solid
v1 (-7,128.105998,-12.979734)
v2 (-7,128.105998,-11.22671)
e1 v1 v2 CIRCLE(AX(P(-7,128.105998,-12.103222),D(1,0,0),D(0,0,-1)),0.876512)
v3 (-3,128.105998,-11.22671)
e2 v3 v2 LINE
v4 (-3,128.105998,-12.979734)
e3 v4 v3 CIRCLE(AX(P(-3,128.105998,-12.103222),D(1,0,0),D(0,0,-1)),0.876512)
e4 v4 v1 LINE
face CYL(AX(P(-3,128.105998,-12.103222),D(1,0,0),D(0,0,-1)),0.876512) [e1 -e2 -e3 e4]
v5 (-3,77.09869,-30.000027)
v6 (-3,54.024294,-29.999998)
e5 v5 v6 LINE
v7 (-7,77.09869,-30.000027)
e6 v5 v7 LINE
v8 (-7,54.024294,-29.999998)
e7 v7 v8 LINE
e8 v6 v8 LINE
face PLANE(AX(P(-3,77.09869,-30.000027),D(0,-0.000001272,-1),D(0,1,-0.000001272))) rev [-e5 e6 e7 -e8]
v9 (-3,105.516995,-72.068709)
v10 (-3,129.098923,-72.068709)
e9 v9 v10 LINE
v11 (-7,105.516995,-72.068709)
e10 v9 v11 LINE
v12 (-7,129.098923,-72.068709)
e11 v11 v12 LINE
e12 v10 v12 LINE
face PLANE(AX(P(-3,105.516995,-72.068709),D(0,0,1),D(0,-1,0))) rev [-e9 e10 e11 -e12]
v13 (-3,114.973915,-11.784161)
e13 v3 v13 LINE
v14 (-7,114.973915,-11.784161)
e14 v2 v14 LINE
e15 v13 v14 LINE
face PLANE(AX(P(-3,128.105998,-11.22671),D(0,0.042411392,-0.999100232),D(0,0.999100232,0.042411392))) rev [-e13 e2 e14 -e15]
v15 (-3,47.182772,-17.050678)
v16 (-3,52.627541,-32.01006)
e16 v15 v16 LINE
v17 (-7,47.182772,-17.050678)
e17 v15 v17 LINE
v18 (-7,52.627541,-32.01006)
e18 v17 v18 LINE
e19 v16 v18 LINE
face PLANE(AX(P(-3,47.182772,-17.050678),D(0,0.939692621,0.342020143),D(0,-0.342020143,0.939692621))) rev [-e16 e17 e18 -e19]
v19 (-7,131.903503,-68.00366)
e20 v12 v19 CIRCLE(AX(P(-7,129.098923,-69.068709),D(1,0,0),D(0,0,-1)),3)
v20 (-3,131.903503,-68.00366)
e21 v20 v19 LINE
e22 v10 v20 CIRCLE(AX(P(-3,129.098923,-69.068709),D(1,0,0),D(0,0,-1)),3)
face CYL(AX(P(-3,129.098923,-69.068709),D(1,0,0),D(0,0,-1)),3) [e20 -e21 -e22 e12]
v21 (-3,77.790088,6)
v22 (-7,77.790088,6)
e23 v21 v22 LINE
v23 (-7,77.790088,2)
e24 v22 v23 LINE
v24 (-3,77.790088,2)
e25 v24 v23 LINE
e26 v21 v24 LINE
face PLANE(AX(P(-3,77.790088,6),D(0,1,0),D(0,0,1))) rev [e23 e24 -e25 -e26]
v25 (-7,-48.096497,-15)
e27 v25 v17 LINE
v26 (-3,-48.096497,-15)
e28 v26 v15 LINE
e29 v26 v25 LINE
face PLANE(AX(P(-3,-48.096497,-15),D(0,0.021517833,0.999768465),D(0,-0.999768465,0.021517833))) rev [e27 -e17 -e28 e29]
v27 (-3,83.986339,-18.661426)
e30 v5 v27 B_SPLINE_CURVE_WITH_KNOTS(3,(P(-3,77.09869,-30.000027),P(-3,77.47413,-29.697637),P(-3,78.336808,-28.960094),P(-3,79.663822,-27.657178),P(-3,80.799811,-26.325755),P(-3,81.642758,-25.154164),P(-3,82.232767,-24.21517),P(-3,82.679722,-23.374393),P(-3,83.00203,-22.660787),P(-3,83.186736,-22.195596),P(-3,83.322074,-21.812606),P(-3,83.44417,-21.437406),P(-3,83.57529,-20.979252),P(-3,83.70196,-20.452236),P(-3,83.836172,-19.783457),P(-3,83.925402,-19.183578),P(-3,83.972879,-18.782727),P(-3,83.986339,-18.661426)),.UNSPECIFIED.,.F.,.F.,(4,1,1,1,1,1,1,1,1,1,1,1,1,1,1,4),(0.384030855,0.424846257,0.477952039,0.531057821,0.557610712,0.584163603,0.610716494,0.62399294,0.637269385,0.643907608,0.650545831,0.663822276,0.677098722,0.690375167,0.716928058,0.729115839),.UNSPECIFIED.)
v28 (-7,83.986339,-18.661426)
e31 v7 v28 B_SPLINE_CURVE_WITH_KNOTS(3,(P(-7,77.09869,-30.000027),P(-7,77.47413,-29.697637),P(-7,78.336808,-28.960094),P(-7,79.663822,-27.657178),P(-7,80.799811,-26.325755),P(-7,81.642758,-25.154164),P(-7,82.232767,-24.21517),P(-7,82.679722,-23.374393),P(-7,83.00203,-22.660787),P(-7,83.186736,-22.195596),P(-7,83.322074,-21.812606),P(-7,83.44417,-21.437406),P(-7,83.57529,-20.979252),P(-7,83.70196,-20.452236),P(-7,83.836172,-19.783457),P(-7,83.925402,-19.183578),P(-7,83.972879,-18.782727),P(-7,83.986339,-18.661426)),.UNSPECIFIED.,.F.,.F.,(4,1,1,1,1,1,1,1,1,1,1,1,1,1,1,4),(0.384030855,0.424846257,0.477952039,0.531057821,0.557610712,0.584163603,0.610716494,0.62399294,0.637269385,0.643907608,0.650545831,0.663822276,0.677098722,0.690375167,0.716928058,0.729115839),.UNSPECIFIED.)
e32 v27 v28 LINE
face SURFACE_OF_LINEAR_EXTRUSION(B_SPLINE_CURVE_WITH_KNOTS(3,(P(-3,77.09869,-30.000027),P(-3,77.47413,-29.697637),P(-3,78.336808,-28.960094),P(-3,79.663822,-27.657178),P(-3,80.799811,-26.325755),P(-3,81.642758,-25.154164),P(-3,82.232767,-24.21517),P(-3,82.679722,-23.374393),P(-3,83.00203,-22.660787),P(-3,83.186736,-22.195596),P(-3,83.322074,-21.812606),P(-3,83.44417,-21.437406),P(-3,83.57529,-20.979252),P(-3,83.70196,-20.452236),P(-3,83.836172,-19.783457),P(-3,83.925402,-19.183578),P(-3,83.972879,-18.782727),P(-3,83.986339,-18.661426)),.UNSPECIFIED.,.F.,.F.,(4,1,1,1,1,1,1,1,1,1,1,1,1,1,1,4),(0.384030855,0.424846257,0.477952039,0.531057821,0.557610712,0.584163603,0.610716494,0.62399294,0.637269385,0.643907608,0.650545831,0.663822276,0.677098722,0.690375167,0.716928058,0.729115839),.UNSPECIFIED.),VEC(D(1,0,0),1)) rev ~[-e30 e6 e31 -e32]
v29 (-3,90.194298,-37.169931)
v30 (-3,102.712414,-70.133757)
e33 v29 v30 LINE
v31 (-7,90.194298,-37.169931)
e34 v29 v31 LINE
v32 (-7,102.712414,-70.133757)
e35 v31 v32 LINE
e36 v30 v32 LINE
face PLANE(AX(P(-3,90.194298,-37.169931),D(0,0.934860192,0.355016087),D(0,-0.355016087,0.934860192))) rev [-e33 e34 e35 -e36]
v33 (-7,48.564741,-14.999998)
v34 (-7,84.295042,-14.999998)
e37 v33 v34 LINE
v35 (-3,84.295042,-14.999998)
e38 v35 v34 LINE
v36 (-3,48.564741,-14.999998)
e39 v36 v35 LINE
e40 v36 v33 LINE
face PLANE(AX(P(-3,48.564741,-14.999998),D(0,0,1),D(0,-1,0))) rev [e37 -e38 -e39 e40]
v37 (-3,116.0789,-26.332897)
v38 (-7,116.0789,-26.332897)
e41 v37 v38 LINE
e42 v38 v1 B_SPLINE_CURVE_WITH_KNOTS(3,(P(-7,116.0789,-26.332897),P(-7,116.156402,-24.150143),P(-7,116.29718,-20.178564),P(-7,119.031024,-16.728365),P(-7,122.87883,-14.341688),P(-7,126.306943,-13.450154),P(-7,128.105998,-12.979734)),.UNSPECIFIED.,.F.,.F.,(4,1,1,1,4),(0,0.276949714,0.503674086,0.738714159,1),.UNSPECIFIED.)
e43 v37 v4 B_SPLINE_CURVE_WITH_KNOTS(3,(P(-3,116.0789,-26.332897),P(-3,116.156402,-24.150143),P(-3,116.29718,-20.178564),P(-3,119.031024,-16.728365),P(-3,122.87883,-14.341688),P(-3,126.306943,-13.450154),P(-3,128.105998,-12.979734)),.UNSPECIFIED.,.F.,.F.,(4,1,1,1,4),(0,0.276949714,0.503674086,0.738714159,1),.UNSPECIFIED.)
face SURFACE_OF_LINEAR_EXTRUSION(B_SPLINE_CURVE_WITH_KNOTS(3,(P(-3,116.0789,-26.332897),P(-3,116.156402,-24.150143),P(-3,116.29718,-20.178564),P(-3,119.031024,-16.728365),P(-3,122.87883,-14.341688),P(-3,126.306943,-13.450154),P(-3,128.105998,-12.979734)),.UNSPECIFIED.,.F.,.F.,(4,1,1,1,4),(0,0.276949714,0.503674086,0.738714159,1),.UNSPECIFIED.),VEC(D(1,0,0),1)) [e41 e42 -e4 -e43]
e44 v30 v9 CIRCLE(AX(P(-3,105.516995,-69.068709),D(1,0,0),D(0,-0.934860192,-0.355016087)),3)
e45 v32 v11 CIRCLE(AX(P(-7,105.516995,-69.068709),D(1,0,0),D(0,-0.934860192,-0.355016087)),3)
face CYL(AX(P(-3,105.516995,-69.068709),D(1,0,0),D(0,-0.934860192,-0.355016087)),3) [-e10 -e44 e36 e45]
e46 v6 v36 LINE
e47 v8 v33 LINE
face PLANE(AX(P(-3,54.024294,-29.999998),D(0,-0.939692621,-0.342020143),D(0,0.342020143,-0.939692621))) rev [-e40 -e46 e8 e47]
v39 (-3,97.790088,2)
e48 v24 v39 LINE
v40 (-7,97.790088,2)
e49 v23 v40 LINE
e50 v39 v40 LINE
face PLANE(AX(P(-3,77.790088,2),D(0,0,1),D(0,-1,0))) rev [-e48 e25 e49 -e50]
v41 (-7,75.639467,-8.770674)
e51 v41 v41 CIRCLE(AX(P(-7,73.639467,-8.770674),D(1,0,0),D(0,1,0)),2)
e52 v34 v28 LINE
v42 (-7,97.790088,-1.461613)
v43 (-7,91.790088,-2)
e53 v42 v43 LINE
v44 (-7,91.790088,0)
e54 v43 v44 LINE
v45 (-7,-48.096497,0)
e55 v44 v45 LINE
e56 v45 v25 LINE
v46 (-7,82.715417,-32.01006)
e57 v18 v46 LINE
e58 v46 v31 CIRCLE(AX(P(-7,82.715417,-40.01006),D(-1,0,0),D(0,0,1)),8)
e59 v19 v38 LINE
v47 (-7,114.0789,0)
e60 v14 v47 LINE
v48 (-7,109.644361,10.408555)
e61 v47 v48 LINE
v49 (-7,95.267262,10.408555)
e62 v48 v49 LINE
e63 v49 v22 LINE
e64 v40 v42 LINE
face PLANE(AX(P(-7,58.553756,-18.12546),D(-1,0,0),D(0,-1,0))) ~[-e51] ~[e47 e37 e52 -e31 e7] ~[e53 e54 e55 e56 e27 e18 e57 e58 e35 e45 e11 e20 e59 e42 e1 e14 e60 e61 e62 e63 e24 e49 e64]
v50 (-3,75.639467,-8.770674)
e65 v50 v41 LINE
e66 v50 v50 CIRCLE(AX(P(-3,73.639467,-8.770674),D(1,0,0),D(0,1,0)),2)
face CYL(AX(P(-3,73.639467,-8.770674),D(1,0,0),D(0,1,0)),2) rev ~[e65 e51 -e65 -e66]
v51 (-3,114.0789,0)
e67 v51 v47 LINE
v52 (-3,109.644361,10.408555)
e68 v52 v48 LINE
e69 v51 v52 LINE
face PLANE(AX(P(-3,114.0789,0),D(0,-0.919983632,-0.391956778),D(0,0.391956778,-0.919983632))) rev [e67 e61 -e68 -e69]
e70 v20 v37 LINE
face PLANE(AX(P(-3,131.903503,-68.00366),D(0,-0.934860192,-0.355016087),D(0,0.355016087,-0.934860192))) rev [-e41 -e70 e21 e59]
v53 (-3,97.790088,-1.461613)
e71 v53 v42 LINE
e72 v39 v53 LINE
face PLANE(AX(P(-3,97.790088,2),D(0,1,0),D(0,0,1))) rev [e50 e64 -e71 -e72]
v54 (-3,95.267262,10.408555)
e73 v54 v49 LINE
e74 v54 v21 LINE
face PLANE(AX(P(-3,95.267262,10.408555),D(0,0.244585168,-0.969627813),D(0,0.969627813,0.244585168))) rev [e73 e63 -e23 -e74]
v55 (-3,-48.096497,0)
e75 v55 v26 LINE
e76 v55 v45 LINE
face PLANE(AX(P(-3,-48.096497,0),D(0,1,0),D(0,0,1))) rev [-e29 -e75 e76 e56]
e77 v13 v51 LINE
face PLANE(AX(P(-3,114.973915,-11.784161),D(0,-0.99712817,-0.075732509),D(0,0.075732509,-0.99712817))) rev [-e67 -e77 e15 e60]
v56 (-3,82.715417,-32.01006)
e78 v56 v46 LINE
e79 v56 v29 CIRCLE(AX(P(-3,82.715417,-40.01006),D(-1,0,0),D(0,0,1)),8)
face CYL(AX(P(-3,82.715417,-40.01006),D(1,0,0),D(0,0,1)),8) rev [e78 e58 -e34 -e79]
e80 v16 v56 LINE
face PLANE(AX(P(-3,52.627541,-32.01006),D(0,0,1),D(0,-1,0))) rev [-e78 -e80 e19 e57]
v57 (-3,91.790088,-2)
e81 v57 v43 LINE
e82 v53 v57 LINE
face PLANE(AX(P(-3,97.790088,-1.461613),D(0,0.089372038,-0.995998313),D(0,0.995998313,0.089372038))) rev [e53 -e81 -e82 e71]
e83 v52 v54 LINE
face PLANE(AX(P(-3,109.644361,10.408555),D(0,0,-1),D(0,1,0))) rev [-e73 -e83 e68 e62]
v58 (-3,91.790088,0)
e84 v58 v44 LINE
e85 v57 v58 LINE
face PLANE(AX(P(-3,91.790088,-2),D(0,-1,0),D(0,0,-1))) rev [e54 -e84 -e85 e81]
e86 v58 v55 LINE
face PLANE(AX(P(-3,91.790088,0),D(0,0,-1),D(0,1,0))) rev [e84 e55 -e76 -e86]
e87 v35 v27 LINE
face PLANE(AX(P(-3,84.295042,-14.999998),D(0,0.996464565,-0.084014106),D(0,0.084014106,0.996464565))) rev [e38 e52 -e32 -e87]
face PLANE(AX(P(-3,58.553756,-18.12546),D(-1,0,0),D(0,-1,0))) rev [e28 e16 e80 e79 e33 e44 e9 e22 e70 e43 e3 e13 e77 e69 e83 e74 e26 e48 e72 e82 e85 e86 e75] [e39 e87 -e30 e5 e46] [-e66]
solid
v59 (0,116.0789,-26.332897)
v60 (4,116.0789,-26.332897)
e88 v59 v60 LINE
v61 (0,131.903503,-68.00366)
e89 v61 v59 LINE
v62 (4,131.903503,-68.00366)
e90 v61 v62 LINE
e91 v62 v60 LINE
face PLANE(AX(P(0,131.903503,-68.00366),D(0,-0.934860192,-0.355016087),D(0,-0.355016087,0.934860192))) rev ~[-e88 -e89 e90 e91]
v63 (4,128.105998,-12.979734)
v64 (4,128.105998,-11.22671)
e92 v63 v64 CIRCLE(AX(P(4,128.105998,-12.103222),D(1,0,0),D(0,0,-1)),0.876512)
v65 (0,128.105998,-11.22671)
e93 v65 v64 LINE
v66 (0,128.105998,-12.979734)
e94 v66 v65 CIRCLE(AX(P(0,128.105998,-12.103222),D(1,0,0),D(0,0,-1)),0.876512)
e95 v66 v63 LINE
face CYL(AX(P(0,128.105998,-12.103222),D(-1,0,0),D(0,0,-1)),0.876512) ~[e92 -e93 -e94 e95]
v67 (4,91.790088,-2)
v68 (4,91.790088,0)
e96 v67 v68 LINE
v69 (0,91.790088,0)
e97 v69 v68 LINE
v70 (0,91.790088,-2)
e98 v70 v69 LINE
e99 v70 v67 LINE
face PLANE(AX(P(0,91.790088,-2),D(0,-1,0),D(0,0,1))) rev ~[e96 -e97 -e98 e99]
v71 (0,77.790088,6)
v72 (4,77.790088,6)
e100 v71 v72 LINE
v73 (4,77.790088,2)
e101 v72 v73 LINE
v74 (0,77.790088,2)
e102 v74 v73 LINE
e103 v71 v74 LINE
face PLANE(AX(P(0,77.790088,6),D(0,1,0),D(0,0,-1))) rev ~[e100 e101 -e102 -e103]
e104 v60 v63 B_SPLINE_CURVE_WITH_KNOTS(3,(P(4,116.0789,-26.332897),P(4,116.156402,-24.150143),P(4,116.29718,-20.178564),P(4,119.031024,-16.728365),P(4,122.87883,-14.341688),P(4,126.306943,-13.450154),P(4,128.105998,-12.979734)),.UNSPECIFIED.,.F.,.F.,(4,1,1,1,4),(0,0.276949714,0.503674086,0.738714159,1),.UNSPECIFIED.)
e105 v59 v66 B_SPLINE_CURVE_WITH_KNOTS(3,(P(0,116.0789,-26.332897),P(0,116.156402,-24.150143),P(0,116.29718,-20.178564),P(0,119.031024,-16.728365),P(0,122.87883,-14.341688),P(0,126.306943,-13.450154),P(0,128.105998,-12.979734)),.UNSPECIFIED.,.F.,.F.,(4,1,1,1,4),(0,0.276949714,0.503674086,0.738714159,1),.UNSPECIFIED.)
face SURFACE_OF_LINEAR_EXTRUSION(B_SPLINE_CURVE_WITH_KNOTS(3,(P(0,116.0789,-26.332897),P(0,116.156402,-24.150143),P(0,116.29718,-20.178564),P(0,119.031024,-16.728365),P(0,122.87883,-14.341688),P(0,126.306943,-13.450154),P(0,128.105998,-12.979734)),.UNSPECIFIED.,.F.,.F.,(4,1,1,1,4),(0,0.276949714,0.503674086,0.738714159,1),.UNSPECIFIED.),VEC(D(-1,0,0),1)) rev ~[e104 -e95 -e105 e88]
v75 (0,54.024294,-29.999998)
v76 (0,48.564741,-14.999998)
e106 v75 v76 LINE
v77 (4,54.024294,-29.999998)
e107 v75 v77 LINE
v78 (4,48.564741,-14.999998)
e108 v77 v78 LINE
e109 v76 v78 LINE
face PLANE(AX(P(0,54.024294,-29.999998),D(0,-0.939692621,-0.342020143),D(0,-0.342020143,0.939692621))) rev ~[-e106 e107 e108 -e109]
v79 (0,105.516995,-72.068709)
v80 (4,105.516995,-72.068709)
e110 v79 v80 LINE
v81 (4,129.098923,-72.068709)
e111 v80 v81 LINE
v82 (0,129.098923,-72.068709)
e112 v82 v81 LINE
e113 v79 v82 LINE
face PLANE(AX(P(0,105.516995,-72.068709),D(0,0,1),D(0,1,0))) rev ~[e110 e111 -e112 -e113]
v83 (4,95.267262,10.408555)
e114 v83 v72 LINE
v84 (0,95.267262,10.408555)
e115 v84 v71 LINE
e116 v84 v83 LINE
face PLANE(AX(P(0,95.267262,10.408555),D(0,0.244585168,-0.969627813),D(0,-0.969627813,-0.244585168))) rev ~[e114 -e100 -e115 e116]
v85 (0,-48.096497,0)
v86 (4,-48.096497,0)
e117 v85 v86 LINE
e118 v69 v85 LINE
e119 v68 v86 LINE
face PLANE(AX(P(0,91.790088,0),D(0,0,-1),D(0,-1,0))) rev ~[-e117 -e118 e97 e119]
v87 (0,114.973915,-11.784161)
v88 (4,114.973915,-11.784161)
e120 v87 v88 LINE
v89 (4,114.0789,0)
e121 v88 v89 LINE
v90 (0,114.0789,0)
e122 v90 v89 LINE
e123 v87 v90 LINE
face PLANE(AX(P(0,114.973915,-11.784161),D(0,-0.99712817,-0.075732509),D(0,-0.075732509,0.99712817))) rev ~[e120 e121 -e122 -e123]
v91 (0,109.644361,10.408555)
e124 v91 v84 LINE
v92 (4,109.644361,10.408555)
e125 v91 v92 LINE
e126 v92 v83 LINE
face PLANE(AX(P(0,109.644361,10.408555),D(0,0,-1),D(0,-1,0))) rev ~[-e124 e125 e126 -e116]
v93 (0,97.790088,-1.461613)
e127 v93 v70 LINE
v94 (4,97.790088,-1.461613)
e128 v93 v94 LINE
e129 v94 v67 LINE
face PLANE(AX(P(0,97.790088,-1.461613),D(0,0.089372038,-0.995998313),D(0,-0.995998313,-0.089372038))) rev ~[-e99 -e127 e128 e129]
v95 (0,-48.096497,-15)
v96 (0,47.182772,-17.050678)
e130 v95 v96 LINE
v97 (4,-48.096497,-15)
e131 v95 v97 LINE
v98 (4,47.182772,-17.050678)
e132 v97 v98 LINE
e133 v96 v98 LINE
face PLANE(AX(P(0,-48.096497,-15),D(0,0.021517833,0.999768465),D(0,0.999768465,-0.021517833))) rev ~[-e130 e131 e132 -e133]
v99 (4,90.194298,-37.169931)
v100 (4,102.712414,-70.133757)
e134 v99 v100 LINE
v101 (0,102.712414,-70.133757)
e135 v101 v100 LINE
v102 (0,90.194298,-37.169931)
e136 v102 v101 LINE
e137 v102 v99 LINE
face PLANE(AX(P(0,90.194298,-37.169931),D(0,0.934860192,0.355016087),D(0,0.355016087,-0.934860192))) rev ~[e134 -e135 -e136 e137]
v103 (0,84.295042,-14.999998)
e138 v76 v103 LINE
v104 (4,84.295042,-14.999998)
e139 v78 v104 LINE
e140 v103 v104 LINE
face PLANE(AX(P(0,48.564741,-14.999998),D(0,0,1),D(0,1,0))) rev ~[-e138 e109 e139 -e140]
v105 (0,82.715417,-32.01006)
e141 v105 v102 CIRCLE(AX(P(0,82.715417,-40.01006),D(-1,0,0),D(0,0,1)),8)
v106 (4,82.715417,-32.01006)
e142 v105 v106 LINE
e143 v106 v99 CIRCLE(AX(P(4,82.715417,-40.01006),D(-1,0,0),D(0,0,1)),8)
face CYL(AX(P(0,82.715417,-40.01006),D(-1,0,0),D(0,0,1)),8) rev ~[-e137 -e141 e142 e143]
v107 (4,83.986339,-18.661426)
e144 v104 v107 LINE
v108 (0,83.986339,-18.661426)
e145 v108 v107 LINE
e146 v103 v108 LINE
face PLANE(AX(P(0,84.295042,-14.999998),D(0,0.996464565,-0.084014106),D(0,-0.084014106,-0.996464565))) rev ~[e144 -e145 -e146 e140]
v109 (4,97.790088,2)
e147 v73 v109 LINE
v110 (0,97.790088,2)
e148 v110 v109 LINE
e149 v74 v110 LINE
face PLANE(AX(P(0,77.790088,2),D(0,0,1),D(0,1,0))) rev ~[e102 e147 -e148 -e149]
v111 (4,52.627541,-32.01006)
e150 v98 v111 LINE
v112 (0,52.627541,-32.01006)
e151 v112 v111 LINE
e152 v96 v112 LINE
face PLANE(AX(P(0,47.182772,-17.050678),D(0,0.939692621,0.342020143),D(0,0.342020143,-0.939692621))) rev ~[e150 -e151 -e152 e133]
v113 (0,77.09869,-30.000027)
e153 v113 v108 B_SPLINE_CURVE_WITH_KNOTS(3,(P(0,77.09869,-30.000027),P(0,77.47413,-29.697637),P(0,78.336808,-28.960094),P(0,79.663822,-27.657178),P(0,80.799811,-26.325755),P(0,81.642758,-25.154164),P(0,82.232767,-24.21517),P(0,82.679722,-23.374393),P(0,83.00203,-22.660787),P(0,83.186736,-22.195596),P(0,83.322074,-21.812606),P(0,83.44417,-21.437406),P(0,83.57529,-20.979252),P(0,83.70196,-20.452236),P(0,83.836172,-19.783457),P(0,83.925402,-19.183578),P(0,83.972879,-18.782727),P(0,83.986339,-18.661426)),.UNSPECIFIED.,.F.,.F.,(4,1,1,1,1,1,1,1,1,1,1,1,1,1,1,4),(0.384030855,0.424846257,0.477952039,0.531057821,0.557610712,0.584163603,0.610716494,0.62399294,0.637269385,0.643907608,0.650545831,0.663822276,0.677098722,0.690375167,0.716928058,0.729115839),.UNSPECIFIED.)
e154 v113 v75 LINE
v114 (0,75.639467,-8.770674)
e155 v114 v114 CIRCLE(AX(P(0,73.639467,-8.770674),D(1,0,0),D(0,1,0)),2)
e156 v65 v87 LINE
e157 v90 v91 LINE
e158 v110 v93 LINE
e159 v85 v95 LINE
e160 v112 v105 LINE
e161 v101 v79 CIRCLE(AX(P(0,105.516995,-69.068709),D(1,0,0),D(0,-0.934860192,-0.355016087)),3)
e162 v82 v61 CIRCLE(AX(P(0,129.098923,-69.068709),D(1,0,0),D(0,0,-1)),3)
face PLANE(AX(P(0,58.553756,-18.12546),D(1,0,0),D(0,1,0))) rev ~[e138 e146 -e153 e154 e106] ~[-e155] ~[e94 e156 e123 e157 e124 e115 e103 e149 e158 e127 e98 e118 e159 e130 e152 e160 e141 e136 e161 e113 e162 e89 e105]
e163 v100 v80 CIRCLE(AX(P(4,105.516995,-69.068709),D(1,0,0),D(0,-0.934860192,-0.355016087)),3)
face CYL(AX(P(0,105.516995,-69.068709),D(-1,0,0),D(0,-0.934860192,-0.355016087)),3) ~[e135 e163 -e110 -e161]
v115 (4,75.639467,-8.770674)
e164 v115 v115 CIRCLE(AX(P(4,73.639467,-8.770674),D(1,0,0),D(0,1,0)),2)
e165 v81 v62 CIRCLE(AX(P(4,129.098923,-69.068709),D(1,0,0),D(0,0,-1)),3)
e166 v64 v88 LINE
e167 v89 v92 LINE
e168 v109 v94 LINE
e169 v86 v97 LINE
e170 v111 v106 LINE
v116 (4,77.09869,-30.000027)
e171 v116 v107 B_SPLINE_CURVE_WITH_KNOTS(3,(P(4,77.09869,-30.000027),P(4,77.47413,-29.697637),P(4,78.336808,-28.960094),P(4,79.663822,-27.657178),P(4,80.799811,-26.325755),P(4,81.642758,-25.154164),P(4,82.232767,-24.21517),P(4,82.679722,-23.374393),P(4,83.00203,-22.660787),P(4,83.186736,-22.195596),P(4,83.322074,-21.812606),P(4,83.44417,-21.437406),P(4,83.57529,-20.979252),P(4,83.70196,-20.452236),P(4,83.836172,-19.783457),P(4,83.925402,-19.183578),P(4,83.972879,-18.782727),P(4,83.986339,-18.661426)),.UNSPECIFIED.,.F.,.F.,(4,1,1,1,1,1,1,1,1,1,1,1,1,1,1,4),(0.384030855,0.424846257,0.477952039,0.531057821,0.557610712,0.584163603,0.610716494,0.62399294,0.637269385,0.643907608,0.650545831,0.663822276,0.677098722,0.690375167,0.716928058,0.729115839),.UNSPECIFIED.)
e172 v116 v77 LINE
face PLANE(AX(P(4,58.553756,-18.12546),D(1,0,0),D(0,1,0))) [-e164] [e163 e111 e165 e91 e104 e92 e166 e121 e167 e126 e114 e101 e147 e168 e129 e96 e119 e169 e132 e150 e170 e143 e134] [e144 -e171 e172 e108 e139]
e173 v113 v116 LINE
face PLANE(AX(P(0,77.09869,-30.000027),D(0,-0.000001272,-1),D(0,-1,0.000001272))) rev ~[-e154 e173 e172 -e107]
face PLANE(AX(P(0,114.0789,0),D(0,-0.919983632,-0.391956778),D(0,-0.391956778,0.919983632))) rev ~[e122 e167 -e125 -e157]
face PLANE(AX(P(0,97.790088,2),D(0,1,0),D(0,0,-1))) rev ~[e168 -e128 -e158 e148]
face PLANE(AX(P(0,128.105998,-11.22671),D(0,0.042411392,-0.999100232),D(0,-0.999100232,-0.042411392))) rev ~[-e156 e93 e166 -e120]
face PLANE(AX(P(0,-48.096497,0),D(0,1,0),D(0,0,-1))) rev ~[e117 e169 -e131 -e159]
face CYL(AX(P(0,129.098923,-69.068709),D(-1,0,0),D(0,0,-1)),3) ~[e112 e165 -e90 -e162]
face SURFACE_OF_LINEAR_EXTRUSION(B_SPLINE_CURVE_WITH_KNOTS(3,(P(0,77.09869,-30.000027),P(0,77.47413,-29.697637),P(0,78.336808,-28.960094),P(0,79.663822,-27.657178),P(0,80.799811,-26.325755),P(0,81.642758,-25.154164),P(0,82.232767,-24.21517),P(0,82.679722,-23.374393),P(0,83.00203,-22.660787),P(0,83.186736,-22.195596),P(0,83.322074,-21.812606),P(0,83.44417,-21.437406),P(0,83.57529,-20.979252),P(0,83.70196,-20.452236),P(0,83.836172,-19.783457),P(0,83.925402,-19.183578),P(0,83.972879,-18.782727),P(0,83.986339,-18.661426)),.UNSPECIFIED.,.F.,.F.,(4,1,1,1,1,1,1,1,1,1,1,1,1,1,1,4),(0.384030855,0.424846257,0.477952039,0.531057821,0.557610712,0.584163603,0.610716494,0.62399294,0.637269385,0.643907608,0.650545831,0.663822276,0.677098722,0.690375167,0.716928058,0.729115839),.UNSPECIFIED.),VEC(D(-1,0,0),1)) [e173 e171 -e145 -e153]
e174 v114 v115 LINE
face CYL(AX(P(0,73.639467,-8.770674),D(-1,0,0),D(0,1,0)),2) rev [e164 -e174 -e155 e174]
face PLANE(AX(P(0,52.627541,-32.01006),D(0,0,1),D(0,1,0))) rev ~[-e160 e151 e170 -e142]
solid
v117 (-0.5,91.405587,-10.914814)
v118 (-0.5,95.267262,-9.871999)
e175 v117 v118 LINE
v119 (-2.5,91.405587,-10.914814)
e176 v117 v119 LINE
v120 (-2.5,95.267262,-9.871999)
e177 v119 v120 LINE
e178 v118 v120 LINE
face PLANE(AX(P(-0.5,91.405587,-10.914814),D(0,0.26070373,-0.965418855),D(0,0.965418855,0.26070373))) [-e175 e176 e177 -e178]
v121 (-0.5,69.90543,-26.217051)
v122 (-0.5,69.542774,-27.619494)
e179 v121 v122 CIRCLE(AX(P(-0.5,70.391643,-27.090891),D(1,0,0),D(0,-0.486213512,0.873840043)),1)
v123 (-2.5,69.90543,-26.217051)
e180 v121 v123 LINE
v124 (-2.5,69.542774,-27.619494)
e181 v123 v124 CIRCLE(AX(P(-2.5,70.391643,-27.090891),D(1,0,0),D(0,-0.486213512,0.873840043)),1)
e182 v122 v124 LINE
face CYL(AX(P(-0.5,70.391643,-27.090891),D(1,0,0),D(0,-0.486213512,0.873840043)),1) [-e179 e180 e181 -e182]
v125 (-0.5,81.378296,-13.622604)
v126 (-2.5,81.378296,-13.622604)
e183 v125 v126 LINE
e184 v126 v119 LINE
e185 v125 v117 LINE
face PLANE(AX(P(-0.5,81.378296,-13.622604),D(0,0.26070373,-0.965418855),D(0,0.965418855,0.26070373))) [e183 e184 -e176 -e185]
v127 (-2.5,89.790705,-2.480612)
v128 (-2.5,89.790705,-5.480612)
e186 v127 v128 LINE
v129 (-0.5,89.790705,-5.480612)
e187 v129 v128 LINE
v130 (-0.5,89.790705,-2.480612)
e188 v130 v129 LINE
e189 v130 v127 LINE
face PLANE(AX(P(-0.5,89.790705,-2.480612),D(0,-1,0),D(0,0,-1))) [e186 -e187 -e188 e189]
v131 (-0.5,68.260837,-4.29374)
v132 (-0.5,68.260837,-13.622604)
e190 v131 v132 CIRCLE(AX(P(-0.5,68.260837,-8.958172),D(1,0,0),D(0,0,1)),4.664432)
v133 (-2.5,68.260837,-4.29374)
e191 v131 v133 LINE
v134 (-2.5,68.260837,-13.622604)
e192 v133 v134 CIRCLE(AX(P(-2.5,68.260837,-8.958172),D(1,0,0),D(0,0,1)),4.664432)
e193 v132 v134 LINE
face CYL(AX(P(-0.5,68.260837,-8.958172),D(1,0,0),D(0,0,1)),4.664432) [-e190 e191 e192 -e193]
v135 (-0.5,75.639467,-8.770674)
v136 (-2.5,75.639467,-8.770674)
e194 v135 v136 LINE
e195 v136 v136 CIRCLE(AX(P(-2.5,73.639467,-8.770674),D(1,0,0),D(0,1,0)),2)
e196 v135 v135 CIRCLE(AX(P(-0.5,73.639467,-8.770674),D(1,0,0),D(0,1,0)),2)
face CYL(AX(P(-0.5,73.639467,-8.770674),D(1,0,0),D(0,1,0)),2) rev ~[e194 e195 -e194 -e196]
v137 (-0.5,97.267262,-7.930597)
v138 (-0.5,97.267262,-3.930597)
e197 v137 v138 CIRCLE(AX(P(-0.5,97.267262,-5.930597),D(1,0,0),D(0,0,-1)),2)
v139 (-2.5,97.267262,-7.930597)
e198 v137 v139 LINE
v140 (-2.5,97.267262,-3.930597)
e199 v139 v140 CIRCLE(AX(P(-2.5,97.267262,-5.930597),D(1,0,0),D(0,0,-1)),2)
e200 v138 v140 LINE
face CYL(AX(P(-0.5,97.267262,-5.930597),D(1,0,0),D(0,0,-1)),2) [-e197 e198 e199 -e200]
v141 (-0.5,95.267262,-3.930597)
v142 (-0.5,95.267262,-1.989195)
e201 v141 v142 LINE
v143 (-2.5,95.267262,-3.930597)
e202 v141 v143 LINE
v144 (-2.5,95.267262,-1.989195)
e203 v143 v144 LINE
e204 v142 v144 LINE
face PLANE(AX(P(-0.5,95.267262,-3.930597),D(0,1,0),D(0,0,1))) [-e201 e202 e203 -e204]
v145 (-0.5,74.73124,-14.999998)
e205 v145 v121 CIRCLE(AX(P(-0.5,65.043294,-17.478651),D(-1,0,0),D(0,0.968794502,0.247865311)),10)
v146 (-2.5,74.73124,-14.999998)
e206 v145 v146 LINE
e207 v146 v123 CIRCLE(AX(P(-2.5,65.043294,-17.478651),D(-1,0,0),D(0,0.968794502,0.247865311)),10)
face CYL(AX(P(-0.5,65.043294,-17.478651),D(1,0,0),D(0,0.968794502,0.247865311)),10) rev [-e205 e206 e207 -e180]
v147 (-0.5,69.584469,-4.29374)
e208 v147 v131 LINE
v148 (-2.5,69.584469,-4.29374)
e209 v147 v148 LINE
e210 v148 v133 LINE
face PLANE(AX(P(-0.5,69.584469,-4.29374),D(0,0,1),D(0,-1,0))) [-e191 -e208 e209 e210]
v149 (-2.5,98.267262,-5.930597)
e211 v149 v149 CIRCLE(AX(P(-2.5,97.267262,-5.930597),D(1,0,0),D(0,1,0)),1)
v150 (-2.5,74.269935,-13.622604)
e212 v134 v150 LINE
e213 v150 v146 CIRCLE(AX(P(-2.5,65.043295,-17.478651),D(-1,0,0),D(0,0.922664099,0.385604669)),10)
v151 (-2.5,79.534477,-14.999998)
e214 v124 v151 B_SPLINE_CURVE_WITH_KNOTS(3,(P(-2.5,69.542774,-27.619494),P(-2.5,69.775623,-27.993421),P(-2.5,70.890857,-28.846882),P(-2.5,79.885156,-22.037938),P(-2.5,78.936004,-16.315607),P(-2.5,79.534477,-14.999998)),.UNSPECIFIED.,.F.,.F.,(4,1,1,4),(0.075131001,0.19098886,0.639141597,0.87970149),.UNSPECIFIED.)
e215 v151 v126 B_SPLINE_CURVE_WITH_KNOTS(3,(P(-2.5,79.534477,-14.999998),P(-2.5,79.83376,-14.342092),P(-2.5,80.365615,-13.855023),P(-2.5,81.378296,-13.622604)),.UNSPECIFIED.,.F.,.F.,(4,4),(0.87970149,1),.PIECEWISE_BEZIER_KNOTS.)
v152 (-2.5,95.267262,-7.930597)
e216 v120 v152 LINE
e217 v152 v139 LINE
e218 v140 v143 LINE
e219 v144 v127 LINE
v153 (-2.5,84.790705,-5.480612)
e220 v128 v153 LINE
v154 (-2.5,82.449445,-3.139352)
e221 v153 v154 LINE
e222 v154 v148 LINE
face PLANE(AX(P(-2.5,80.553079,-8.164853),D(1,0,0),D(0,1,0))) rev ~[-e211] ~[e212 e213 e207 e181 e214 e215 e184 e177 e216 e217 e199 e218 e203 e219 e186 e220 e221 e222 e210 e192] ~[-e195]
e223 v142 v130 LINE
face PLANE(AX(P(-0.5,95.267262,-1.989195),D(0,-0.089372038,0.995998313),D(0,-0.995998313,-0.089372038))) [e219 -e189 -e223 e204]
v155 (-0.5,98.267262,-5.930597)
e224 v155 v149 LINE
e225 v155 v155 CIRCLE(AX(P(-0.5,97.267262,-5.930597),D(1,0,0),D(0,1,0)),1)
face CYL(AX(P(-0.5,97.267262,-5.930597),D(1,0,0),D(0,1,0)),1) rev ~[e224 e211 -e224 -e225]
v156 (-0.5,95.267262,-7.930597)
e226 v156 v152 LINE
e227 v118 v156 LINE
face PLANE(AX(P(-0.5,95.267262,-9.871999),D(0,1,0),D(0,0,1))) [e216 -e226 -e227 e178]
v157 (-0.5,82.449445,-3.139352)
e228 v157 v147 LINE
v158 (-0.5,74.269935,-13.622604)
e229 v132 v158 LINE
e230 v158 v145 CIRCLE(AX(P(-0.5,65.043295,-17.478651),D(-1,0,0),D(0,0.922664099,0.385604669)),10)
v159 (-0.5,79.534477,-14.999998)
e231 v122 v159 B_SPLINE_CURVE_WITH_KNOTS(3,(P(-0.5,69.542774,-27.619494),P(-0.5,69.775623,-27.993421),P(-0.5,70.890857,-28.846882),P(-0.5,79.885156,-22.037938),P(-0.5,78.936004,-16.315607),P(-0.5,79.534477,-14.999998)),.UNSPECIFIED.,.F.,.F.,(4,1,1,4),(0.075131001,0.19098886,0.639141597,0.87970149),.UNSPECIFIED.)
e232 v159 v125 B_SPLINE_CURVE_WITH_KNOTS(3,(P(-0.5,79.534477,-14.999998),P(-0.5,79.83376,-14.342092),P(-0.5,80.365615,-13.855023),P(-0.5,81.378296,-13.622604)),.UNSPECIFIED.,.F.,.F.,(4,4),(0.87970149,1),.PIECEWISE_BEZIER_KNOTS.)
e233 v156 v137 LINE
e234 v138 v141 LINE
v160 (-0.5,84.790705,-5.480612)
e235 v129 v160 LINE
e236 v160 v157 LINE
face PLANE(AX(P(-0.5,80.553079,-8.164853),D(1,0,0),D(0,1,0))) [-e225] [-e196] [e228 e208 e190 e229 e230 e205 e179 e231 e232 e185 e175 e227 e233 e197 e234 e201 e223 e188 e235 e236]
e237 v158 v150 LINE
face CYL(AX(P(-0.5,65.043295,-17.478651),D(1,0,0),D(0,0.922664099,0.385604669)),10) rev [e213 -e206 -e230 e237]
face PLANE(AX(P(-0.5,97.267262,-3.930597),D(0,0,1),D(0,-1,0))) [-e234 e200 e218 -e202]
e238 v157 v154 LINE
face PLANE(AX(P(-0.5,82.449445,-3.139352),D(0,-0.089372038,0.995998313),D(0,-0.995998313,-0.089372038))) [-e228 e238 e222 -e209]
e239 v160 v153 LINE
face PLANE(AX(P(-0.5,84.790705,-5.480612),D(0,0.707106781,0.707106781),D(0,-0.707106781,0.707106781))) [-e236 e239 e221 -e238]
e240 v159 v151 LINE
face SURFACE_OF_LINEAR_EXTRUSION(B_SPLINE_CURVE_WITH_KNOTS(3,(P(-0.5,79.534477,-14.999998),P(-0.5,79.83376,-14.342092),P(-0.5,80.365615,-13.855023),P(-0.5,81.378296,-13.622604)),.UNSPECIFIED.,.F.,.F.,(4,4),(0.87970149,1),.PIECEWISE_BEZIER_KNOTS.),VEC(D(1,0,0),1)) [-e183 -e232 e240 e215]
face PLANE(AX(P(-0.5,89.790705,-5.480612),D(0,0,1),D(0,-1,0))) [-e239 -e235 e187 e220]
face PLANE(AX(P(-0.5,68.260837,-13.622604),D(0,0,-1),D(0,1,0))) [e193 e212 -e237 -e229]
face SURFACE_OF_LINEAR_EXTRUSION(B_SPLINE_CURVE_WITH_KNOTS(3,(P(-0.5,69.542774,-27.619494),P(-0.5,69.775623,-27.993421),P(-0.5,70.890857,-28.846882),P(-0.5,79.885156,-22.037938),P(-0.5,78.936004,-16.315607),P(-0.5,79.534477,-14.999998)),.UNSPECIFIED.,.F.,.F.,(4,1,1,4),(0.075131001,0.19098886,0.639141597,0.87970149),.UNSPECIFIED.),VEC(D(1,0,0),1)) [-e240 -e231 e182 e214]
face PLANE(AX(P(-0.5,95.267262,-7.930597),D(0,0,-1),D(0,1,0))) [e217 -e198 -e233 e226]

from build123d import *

# Parameters (mm, degrees)
F1_START = -0.5
F0_R     = 2
F0_R_2   = 1
F1_DEPTH = 2
F2_DEPTH = 4


# Not quite as in the source:
# - ends of sketch curves that miss each other by under 0.0002 mm in the source are joined
# - the dataset's text gives a spline's control points without its knots; the knots are read off the source's solid
# - a feature names something its author has since deleted; it is built from what else it names


with BuildPart() as f1:
    # F0 (on Right) → F1 (new body)
    with BuildSketch(Plane.YZ.offset(F1_START)):
        with BuildLine():
            ThreePointArc((74.2699354887, -13.6226043105), (74.5256304067, -14.3029139587), (74.7312395212, -14.9999978852))
            Line((74.7312395212, -14.9999978852), (79.5344771551, -14.9999978852))
            add(Edge.make_bspline(
                [(79.5344771551, -14.9999978852), (79.833759811, -14.3420916762), (80.3656146055, -13.855022927), (81.3782960176, -13.6226043105)],
                knots=[0.8797014903, 0.8797014903, 0.8797014903, 0.8797014903, 1, 1, 1, 1], degree=3))
            Line((81.3782960176, -13.6226043105), (91.4055867413, -10.9148137206))
            Line((91.4055867413, -10.9148137206), (95.2672621608, -9.8719988018))
            Line((95.2672621608, -9.8719988018), (95.2672621608, -7.9305966889))
            Line((95.2672621608, -7.9305966889), (95.2672621608, -3.9305966889))
            Line((95.2672621608, -3.9305966889), (95.2672621608, -1.989194576))
            Line((95.2672621608, -1.989194576), (89.7907053864, -2.4806121155))
            Line((89.7907053864, -2.4806121155), (89.7907053864, -5.4806121155))
            Line((89.7907053864, -5.4806121155), (84.7907053864, -5.4806121155))
            Line((84.7907053864, -5.4806121155), (82.4494448697, -3.1393515989))
            Line((82.4494448697, -3.1393515989), (69.5844688412, -4.2937402278))
            Line((69.5844688412, -4.2937402278), (68.2608369428, -4.2937402278))
            ThreePointArc((68.2608369428, -4.2937402278), (63.5964049015, -8.9581722692), (68.2608369428, -13.6226043105))
            Line((68.2608369428, -13.6226043105), (74.2699354887, -13.6226043105))
        make_face()
        with Locations((73.6394673586, -8.7706744671)):
            Circle(F0_R, mode=Mode.SUBTRACT)
        with BuildLine():
            ThreePointArc((74.7312395212, -14.9999978852), (74.229250114, -21.4306402993), (69.9054296146, -26.2170514299))
            ThreePointArc((69.9054296146, -26.2170514299), (69.4234887038, -26.8405376944), (69.5427737838, -27.6194941971))
            add(Edge.make_bspline(
                [(69.5427737838, -27.6194941971), (69.7756231299, -27.9934208955), (70.8908571939, -28.846881775), (79.88515612, -22.0379378106), (78.9360042075, -16.3156072614), (79.5344771551, -14.9999978852)],
                knots=[0.0751310014, 0.0751310014, 0.0751310014, 0.0751310014, 0.1909888597, 0.6391415971, 0.8797014903, 0.8797014903, 0.8797014903, 0.8797014903], degree=3))
            Line((79.5344771551, -14.9999978852), (74.7312395212, -14.9999978852))
        make_face()
        with BuildLine():
            Line((95.2672621608, -3.9305966889), (95.2672621608, -7.9305966889))
            Line((95.2672621608, -7.9305966889), (97.2672621608, -7.9305966889))
            ThreePointArc((97.2672621608, -7.9305966889), (99.2672621608, -5.9305966889), (97.2672621608, -3.9305966889))
            Line((97.2672621608, -3.9305966889), (95.2672621608, -3.9305966889))
        make_face()
        with Locations((97.2672621608, -5.9305966889)):
            Circle(F0_R_2, mode=Mode.SUBTRACT)
    extrude(amount=-F1_DEPTH)


with BuildPart() as f2:
    # F0 (on Right) → F2 (new body)
    with BuildSketch(Plane.YZ):
        with BuildLine():
            ThreePointArc((82.7154165104, -32.0100596195), (87.2584865329, -33.4251894787), (90.194298045, -37.1699309267))
            Line((90.194298045, -37.1699309267), (102.7124142253, -70.1337568918))
            ThreePointArc((102.7124142253, -70.1337568918), (103.8133435424, -71.5380349348), (105.5169948008, -72.068708632))
            Line((105.5169948008, -72.068708632), (129.0989228233, -72.068708632))
            ThreePointArc((129.0989228233, -72.068708632), (131.5682491261, -70.7723598904), (131.9035033988, -68.0036603722))
            Line((131.9035033988, -68.0036603722), (116.0789003285, -26.3328966518))
            add(Edge.make_bspline(
                [(116.0789003285, -26.3328966518), (116.1564016078, -24.1501429386), (116.2971797879, -20.1785641936), (119.0310238282, -16.7283649073), (122.8788302042, -14.3416877179), (126.3069431811, -13.450153948), (128.1059980392, -12.9797337577)],
                knots=[0, 0, 0, 0, 0.2769497136, 0.5036740855, 0.738714159, 1, 1, 1, 1], degree=3))
            ThreePointArc((128.1059980392, -12.9797337577), (128.982509952, -12.1032218449), (128.1059980392, -11.2267099321))
            Line((128.1059980392, -11.2267099321), (114.9739147732, -11.7841614367))
            Line((114.9739147732, -11.7841614367), (114.0789003285, 0))
            Line((114.0789003285, 0), (109.6443608403, 10.4085551575))
            Line((109.6443608403, 10.4085551575), (95.2672621608, 10.4085551575))
            Line((95.2672621608, 10.4085551575), (77.7900875211, 6))
            Line((77.7900875211, 6), (77.7900875211, 2))
            Line((77.7900875211, 2), (97.7900875211, 2))
            Line((97.7900875211, 2), (97.7900875211, 0))
            Line((97.7900875211, 0), (97.7900875211, -1.4616133168))
            Line((97.7900875211, -1.4616133168), (91.7900875211, -2))
            Line((91.7900875211, -2), (91.7900875211, 0))
            Line((91.7900875211, 0), (-48.0964966012, 0))
            Line((-48.0964966012, 0), (-48.0964966012, -15))
            Line((-48.0964966012, -15), (47.1827716724, -17.0506781676))
            Line((47.1827716724, -17.0506781676), (52.6275412439, -32.0100596195))
            Line((52.6275412439, -32.0100596195), (82.7154165104, -32.0100596195))
        make_face()
        with BuildLine():
            Line((48.5647406346, -14.9999978852), (74.7312395212, -14.9999978852))
            ThreePointArc((74.7312395212, -14.9999978852), (74.5256304067, -14.3029139587), (74.2699354887, -13.6226043105))
            Line((74.2699354887, -13.6226043105), (68.2608369428, -13.6226043105))
            ThreePointArc((68.2608369428, -13.6226043105), (63.5964049015, -8.9581722692), (68.2608369428, -4.2937402278))
            Line((68.2608369428, -4.2937402278), (69.5844688412, -4.2937402278))
            Line((69.5844688412, -4.2937402278), (82.4494448697, -3.1393515989))
            Line((82.4494448697, -3.1393515989), (84.7907053864, -5.4806121155))
            Line((84.7907053864, -5.4806121155), (89.7907053864, -5.4806121155))
            Line((89.7907053864, -5.4806121155), (89.7907053864, -2.4806121155))
            Line((89.7907053864, -2.4806121155), (95.2672621608, -1.989194576))
            Line((95.2672621608, -1.989194576), (95.2672621608, -3.9305966889))
            Line((95.2672621608, -3.9305966889), (97.2672621608, -3.9305966889))
            ThreePointArc((97.2672621608, -3.9305966889), (99.2672621608, -5.9305966889), (97.2672621608, -7.9305966889))
            Line((97.2672621608, -7.9305966889), (95.2672621608, -7.9305966889))
            Line((95.2672621608, -7.9305966889), (95.2672621608, -9.8719988018))
            Line((95.2672621608, -9.8719988018), (95.7886696202, -11.8028365115))
            Line((95.7886696202, -11.8028365115), (91.9269942007, -12.8456514304))
            Line((91.9269942007, -12.8456514304), (91.4055867413, -10.9148137206))
            Line((91.4055867413, -10.9148137206), (81.3782960176, -13.6226043105))
            add(Edge.make_bspline(
                [(79.5344771551, -14.9999978852), (79.833759811, -14.3420916762), (80.3656146055, -13.855022927), (81.3782960176, -13.6226043105)],
                knots=[0.8797014903, 0.8797014903, 0.8797014903, 0.8797014903, 1, 1, 1, 1], degree=3))
            Line((79.5344771551, -14.9999978852), (84.2950418591, -14.9999978852))
            Line((84.2950418591, -14.9999978852), (83.986338858, -18.6614259073))
            add(Edge.make_bspline(
                [(77.0986897784, -30.0000272336), (77.4741298849, -29.6976374668), (78.3368077115, -28.960094006), (79.6638223749, -27.6571775431), (80.7998106474, -26.3257545652), (81.6427583036, -25.1541637131), (82.2327671194, -24.2151704071), (82.6797224931, -23.3743926577), (83.002030475, -22.6607865386), (83.1867359511, -22.1955964224), (83.3220738815, -21.8126055157), (83.4441699526, -21.4374057344), (83.5752904919, -20.9792524975), (83.7019603463, -20.4522364549), (83.8361720396, -19.7834574031), (83.9254022758, -19.1835780723), (83.97287916, -18.7827266699), (83.986338858, -18.6614259073)],
                knots=[0.3840308553, 0.3840308553, 0.3840308553, 0.3840308553, 0.4248462567, 0.4779520388, 0.5310578209, 0.5576107119, 0.584163603, 0.610716494, 0.6239929395, 0.6372693851, 0.6439076078, 0.6505458306, 0.6638222761, 0.6770987216, 0.6903751672, 0.7169280582, 0.7291158391, 0.7291158391, 0.7291158391, 0.7291158391], degree=3))
            Line((77.0986897784, -30.0000272336), (54.0242941486, -29.9999978852))
            Line((54.0242941486, -29.9999978852), (48.5647406346, -14.9999978852))
        make_face(mode=Mode.SUBTRACT)
        with BuildLine():
            ThreePointArc((74.2699354887, -13.6226043105), (74.5256304067, -14.3029139587), (74.7312395212, -14.9999978852))
            Line((74.7312395212, -14.9999978852), (79.5344771551, -14.9999978852))
            add(Edge.make_bspline(
                [(79.5344771551, -14.9999978852), (79.833759811, -14.3420916762), (80.3656146055, -13.855022927), (81.3782960176, -13.6226043105)],
                knots=[0.8797014903, 0.8797014903, 0.8797014903, 0.8797014903, 1, 1, 1, 1], degree=3))
            Line((81.3782960176, -13.6226043105), (91.4055867413, -10.9148137206))
            Line((91.4055867413, -10.9148137206), (95.2672621608, -9.8719988018))
            Line((95.2672621608, -9.8719988018), (95.2672621608, -7.9305966889))
            Line((95.2672621608, -7.9305966889), (95.2672621608, -3.9305966889))
            Line((95.2672621608, -3.9305966889), (95.2672621608, -1.989194576))
            Line((95.2672621608, -1.989194576), (89.7907053864, -2.4806121155))
            Line((89.7907053864, -2.4806121155), (89.7907053864, -5.4806121155))
            Line((89.7907053864, -5.4806121155), (84.7907053864, -5.4806121155))
            Line((84.7907053864, -5.4806121155), (82.4494448697, -3.1393515989))
            Line((82.4494448697, -3.1393515989), (69.5844688412, -4.2937402278))
            Line((69.5844688412, -4.2937402278), (68.2608369428, -4.2937402278))
            ThreePointArc((68.2608369428, -4.2937402278), (63.5964049015, -8.9581722692), (68.2608369428, -13.6226043105))
            Line((68.2608369428, -13.6226043105), (74.2699354887, -13.6226043105))
        make_face()
        with Locations((73.6394673586, -8.7706744671)):
            Circle(F0_R, mode=Mode.SUBTRACT)
        with BuildLine():
            Line((95.2672621608, -3.9305966889), (95.2672621608, -7.9305966889))
            Line((95.2672621608, -7.9305966889), (97.2672621608, -7.9305966889))
            ThreePointArc((97.2672621608, -7.9305966889), (99.2672621608, -5.9305966889), (97.2672621608, -3.9305966889))
            Line((97.2672621608, -3.9305966889), (95.2672621608, -3.9305966889))
        make_face()
        with Locations((97.2672621608, -5.9305966889)):
            Circle(F0_R_2, mode=Mode.SUBTRACT)
        Polygon((95.2672621608, -9.8719988018), (91.4055867413, -10.9148137206), (91.9269942007, -12.8456514304), (95.7886696202, -11.8028365115), align=None)
        with Locations((97.2672621608, -5.9305966889)):
            Circle(F0_R_2)
    extrude(amount=F2_DEPTH)


with BuildPart() as f4_1:
    # F4: instance of F2
    add(f2.part.mirror(Plane.YZ.offset(-1.5)))


solid = Compound([f1.part, f2.part, f4_1.part])
